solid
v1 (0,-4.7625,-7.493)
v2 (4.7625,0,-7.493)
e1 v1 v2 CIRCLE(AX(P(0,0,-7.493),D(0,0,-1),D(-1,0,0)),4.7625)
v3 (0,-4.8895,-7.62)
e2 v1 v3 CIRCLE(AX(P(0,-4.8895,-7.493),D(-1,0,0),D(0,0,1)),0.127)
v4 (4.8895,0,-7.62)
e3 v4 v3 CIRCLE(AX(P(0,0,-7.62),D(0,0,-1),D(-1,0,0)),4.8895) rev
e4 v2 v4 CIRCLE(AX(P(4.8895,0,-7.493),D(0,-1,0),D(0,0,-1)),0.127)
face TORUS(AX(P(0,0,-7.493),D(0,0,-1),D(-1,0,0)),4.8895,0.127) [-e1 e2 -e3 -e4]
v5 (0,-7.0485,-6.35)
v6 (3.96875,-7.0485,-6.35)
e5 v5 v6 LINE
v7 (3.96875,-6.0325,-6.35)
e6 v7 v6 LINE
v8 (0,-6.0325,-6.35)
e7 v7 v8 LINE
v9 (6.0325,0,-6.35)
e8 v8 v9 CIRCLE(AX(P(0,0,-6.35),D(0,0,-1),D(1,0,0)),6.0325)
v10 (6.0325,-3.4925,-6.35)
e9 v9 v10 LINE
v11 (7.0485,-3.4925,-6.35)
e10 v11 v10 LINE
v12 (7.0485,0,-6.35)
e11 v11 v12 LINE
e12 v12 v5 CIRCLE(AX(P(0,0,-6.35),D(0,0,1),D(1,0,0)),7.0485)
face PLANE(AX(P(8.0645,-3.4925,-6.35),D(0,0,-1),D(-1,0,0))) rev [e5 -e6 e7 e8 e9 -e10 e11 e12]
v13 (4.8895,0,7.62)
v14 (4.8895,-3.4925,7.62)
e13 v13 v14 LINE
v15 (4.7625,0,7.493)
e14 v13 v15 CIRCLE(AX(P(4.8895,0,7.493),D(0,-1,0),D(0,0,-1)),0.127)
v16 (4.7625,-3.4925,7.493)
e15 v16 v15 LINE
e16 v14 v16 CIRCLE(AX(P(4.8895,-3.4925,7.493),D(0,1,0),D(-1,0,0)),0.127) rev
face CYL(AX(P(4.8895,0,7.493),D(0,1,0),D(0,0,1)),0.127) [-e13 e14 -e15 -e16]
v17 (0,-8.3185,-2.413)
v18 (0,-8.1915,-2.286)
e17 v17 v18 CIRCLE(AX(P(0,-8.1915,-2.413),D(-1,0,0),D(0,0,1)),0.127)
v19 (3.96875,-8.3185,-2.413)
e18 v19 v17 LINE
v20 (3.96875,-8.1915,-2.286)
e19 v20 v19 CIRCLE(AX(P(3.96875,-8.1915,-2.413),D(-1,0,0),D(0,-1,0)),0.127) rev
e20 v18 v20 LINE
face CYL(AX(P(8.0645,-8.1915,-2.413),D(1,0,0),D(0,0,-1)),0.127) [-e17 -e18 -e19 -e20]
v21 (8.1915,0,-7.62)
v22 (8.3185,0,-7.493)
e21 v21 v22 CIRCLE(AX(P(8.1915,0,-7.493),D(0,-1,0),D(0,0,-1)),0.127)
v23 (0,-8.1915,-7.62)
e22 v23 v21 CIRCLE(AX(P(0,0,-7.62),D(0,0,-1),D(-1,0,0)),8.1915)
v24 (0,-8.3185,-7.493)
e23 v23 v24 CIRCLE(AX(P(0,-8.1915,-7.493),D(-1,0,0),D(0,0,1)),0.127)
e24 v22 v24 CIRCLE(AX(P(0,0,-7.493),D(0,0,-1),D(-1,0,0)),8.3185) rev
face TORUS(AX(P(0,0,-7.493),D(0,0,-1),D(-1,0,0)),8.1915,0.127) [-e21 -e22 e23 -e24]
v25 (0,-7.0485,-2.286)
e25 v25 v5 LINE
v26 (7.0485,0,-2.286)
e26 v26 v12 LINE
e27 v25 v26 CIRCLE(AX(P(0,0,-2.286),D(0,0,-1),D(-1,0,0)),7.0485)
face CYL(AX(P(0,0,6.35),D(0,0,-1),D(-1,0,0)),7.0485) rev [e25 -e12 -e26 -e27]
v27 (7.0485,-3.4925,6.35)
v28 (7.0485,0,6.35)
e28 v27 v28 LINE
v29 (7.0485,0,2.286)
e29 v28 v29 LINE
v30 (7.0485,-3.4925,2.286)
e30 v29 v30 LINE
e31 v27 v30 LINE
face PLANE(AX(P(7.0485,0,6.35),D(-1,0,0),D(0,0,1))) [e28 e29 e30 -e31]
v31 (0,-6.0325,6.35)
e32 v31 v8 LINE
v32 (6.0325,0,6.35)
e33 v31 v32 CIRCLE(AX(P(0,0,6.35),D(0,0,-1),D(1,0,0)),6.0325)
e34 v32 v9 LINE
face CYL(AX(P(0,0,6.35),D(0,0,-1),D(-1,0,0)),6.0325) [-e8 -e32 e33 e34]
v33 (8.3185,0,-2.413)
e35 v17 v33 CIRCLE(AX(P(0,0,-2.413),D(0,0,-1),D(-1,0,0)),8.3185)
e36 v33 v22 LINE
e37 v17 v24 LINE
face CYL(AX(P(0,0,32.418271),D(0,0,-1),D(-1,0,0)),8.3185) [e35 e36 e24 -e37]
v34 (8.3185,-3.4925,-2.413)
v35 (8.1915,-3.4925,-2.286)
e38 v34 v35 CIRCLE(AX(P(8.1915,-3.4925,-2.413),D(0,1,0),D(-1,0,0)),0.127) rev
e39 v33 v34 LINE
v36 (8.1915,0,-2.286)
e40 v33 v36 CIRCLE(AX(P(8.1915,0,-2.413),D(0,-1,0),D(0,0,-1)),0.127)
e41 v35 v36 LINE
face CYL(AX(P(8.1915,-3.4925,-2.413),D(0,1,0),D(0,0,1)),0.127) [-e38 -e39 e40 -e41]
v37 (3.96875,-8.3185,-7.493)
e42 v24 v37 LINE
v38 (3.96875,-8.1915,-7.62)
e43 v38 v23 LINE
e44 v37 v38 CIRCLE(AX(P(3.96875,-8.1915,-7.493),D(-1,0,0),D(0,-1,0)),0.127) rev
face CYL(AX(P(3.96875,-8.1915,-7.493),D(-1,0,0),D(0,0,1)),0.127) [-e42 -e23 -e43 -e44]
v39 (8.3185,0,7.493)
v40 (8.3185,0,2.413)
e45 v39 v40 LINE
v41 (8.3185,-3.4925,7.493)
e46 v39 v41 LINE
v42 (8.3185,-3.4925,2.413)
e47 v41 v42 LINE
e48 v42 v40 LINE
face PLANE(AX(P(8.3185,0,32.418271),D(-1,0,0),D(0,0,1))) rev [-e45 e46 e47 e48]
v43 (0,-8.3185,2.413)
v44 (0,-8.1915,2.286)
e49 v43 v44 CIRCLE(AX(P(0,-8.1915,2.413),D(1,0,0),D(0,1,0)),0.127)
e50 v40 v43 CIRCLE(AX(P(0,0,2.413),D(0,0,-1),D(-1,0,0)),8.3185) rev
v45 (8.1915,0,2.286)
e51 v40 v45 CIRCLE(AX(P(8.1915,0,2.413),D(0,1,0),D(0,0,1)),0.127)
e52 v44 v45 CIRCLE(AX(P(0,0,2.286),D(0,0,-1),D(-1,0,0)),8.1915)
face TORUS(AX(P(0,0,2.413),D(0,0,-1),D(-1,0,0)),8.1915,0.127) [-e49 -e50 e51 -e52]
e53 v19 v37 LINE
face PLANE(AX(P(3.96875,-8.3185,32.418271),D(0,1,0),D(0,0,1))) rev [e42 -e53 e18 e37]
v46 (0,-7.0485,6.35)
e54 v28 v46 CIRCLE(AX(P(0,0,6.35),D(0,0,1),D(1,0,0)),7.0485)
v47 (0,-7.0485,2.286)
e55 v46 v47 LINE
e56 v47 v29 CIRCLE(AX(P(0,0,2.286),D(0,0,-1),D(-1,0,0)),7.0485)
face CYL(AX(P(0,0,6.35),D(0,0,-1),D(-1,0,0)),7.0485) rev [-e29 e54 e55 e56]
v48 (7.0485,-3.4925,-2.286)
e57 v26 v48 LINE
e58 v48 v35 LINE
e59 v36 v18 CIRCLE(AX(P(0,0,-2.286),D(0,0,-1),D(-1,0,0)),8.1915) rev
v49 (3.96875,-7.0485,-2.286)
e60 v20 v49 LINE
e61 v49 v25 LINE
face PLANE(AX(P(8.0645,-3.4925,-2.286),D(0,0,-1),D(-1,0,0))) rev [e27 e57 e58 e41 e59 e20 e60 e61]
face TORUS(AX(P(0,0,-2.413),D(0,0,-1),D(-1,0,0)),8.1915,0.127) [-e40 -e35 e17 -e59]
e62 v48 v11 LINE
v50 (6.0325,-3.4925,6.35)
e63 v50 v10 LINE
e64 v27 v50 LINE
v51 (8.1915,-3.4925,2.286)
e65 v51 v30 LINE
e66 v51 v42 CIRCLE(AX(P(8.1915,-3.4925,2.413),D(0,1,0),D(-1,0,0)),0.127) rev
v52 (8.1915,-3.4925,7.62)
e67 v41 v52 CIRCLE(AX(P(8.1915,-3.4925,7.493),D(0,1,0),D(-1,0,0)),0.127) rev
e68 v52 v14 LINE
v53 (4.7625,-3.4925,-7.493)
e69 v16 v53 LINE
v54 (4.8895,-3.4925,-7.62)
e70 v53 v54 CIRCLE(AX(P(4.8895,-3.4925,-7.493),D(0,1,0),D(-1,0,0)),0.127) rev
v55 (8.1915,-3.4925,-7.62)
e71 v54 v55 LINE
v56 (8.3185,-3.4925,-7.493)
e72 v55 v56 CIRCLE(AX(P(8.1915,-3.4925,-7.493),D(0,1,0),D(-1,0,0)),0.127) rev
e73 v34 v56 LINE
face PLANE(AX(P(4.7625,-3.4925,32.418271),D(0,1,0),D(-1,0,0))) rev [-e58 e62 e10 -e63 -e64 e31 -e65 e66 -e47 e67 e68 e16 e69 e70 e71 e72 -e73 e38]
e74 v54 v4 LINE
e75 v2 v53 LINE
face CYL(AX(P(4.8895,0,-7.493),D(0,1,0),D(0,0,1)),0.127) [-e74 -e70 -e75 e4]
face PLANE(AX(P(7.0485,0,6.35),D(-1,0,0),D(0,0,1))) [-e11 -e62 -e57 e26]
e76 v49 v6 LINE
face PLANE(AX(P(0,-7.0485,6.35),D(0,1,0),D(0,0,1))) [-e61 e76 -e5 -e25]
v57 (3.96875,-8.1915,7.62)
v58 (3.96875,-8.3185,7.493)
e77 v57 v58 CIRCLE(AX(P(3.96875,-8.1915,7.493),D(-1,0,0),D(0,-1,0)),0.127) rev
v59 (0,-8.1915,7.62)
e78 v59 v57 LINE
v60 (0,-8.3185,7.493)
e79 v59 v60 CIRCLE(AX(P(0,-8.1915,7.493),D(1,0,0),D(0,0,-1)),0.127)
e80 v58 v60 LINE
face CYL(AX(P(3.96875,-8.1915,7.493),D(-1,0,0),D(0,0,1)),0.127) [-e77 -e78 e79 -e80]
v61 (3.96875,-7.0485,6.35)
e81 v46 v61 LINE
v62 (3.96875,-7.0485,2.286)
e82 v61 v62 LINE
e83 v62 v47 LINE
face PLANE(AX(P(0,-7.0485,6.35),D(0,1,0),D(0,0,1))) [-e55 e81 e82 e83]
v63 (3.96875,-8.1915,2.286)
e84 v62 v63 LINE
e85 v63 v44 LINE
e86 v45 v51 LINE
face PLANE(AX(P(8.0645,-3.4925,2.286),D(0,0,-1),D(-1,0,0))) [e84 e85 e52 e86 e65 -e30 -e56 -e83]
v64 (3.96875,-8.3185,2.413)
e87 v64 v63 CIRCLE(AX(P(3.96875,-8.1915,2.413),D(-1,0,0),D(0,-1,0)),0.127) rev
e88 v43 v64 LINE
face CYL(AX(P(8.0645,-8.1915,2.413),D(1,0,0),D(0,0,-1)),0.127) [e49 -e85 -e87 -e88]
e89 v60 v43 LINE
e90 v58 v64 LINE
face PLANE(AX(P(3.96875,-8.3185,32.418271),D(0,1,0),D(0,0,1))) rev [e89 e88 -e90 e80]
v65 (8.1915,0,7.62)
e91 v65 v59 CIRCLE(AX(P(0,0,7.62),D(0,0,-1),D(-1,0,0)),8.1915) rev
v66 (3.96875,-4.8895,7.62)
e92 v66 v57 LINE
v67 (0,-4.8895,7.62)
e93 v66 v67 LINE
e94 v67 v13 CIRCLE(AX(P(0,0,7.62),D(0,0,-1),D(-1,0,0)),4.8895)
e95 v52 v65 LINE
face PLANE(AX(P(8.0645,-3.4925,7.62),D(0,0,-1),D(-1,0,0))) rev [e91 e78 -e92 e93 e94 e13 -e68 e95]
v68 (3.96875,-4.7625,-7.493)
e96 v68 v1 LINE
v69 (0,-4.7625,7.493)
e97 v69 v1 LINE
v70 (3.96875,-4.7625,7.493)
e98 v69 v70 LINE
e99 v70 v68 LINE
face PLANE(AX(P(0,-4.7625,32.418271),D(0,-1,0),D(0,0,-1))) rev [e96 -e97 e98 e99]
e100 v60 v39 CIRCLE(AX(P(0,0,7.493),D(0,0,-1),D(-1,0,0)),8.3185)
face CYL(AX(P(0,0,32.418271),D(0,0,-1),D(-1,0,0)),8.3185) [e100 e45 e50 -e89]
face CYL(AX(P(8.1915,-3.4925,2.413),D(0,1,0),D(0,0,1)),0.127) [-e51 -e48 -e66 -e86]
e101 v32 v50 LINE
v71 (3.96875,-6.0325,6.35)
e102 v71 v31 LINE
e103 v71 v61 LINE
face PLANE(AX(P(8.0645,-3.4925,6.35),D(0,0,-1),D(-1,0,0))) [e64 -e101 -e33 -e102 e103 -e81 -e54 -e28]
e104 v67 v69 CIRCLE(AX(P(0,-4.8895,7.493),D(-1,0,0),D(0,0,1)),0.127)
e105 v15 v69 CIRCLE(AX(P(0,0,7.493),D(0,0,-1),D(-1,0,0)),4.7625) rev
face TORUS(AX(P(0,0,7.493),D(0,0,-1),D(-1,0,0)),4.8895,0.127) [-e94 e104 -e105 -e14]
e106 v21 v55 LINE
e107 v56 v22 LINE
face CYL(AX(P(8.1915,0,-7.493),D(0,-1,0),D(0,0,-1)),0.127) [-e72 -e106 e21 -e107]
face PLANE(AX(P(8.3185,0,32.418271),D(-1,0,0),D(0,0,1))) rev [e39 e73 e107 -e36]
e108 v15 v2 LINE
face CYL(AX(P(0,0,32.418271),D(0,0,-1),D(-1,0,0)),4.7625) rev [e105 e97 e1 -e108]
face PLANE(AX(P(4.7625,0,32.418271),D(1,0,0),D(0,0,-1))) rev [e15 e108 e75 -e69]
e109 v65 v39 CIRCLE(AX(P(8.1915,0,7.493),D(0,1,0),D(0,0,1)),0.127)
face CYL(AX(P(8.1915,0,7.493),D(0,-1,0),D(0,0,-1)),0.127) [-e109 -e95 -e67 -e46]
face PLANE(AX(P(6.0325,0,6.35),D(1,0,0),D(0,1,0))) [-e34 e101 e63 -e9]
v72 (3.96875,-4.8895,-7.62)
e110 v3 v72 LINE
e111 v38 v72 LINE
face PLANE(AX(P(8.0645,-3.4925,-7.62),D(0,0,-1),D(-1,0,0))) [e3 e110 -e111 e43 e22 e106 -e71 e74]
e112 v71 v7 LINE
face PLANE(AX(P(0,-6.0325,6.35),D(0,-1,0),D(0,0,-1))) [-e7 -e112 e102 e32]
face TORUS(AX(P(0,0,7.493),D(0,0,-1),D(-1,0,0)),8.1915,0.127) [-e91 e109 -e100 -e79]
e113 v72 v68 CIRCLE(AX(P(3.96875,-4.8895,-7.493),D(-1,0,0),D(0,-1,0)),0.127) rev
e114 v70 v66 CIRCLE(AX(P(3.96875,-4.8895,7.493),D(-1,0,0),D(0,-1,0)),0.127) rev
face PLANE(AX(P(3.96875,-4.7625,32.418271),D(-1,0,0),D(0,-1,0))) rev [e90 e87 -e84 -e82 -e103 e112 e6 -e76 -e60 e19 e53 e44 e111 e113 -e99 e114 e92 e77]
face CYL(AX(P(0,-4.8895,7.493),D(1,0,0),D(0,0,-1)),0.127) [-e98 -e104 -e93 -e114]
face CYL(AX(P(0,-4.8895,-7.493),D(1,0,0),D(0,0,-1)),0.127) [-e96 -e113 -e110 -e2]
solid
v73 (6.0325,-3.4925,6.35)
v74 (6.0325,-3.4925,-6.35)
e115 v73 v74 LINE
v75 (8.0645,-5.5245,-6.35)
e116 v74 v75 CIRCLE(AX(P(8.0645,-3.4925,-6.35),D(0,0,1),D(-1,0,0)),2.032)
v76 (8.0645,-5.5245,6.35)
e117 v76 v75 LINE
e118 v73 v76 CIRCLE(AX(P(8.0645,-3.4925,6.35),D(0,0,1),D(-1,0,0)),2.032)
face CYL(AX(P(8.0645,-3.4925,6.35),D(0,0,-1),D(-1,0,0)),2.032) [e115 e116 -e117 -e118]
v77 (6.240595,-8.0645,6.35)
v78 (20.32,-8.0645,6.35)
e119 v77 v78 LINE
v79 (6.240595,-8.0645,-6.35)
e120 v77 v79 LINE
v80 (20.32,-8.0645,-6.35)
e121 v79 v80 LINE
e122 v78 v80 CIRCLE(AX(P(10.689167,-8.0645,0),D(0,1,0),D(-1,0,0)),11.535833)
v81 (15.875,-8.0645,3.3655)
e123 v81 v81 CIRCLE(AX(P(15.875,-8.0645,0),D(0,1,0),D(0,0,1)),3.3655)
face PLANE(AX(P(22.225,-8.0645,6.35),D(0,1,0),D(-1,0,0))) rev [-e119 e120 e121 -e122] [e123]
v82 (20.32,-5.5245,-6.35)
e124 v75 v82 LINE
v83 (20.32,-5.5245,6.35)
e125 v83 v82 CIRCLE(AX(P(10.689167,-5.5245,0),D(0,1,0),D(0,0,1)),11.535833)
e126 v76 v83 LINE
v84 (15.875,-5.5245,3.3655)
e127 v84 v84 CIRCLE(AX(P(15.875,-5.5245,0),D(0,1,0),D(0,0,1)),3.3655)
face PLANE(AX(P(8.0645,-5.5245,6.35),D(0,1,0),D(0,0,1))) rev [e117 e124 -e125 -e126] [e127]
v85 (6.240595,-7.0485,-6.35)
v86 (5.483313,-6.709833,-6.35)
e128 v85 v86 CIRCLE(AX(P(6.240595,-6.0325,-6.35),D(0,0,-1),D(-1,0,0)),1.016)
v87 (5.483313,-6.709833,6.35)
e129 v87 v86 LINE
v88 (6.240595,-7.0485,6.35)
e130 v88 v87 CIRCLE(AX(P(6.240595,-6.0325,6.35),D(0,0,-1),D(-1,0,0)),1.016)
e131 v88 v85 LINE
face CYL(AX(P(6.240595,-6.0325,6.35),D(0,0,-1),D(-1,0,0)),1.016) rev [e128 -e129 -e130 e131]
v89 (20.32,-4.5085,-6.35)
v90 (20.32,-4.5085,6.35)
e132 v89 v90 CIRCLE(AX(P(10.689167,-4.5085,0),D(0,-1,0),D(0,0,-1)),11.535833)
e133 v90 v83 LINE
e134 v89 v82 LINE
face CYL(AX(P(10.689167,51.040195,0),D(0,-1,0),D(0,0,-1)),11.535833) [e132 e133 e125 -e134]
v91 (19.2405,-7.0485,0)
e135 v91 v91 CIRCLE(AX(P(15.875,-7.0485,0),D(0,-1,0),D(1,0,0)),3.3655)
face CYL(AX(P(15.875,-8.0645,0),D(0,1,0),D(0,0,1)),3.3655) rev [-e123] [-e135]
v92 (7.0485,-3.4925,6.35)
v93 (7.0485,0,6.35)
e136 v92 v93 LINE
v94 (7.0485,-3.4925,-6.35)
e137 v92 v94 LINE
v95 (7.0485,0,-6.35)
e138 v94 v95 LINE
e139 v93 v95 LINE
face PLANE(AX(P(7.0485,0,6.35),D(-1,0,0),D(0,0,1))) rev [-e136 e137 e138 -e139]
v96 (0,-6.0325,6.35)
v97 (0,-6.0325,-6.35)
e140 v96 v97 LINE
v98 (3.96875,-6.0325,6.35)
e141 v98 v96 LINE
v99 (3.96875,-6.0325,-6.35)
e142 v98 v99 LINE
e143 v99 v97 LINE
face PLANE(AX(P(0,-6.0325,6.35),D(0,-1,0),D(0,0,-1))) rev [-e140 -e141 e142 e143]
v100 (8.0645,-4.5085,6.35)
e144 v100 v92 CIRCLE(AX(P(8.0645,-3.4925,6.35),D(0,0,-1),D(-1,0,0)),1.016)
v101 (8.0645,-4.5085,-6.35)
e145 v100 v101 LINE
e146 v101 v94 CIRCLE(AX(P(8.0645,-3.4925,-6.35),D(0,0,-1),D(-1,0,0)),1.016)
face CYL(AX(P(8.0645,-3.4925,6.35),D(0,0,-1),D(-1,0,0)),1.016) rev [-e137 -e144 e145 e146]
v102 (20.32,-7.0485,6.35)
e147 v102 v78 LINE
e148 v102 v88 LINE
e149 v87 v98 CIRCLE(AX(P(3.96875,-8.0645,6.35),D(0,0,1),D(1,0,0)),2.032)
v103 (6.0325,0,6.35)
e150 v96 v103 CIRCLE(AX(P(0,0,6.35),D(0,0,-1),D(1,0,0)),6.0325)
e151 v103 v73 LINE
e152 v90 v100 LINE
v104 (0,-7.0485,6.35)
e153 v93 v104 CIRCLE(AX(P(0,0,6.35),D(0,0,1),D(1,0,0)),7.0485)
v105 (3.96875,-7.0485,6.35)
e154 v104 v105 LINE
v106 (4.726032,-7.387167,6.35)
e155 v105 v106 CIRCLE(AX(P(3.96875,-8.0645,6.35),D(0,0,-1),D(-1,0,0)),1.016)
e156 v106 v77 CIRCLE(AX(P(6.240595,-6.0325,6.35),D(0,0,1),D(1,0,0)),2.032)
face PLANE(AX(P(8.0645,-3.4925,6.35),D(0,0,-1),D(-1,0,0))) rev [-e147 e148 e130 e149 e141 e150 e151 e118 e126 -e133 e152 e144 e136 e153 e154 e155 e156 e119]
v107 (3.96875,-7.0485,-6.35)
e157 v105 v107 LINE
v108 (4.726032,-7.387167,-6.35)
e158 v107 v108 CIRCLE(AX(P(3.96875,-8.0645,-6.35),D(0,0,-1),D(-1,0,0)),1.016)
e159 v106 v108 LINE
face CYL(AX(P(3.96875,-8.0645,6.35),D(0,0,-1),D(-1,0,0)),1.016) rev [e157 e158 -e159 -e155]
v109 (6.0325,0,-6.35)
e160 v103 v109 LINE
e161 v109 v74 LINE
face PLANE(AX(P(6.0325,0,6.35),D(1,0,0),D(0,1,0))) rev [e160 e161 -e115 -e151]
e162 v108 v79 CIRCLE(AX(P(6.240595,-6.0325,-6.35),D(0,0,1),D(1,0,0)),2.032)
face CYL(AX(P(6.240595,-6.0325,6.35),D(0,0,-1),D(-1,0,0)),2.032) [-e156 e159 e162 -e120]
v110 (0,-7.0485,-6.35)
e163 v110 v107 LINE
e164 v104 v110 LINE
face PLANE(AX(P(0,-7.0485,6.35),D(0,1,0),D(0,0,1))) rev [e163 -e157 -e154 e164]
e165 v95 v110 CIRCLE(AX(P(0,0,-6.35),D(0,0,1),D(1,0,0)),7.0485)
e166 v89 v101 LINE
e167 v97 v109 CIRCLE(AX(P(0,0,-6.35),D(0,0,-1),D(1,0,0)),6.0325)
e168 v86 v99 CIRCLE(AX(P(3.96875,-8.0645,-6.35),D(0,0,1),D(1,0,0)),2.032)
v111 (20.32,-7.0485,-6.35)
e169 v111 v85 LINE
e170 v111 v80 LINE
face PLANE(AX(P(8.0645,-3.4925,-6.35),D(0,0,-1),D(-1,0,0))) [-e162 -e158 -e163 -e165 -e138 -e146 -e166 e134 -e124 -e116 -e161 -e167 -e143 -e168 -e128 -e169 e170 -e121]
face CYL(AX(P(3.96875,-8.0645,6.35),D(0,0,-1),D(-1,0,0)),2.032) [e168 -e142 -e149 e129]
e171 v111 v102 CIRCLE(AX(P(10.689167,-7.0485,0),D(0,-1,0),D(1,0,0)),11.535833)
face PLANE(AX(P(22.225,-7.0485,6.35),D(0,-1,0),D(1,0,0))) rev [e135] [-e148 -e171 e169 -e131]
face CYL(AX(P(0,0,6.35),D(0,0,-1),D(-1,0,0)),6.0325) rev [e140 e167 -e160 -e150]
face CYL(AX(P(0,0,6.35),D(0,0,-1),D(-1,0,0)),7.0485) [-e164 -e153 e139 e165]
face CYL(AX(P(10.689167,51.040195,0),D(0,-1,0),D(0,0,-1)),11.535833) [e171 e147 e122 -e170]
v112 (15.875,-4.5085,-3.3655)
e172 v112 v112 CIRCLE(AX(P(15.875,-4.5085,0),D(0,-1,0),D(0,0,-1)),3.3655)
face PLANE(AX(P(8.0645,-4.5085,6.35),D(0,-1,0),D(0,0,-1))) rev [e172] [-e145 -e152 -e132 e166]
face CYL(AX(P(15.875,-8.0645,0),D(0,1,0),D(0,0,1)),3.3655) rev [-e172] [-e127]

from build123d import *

# Parameters (mm, degrees)
BOSS_EXTRUDE1_DEPTH         = 6.35
SKETCH26_R                  = 3.3655
CUT_EXTRUDE1_DEPTH          = 25.480794212
CUT_EXTRUDE3_DEPTH          = 25.480794212
CUT_EXTRUDE3_DEPTH_BACK     = 25.480794212
BOSS_EXTRUDE2_DEPTH         = 7.62
BOSS_EXTRUDE2_DEPTH_BACK    = 7.62
BODY_MOVE_COPY1_START       = -8.0645
BODY_MOVE_COPY1_OUTLINE_R   = 3.3655
BODY_MOVE_COPY1_DEPTH       = 1.016
BODY_MOVE_COPY1_START_2     = -3.4925
BODY_MOVE_COPY1_2_OUTLINE_W = 1.016
BODY_MOVE_COPY1_2_OUTLINE_H = 12.7
BODY_MOVE_COPY1_2_DEPTH     = 3.4925
BODY_MOVE_COPY1_START_3     = -7.387166667
BODY_MOVE_COPY1_3_OUTLINE_W = 1.016
BODY_MOVE_COPY1_3_OUTLINE_H = 12.7
BODY_MOVE_COPY1_3_DEPTH     = 0.338666667
BODY_MOVE_COPY1_START_4     = -5.5245
BODY_MOVE_COPY1_4_OUTLINE_R = 3.3655
BODY_MOVE_COPY1_4_DEPTH     = 2.032
BODY_MOVE_COPY1_5_OUTLINE_W = 1.016
BODY_MOVE_COPY1_5_OUTLINE_H = 12.7
BODY_MOVE_COPY1_5_DEPTH     = 6.0325
BODY_MOVE_COPY1_6_OUTLINE_W = 1.016
BODY_MOVE_COPY1_6_OUTLINE_H = 12.7
BODY_MOVE_COPY1_6_DEPTH     = 1.354666667
BODY_MOVE_COPY1_START_5     = -6.35
BODY_MOVE_COPY1_7_DEPTH     = 12.7
BODY_MOVE_COPY1_8_DEPTH     = 12.7
CUT_EXTRUDE4_DEPTH          = 2.286
CUT_EXTRUDE4_DEPTH_BACK     = 2.286
FILLET1_R                   = 0.127


with BuildPart() as part:
    # Sketch25 → Boss-Extrude1 (new, symmetric)
    with BuildSketch(Plane.XY):
        with BuildLine():
            Line((0, -6.0325), (3.96875, -6.0325))
            ThreePointArc((3.96875, -6.0325), (4.798310526, -6.209546272), (5.483313377, -6.709833333))
            ThreePointArc((5.483313377, -6.709833333), (5.825814802, -6.959976864), (6.240595065, -7.0485))
            Line((6.240595065, -7.0485), (22.225, -7.0485))
            Line((22.225, -7.0485), (22.225, -8.0645))
            Line((22.225, -8.0645), (6.240595065, -8.0645))
            ThreePointArc((6.240595065, -8.0645), (5.411034539, -7.887453728), (4.726031688, -7.387166667))
            ThreePointArc((4.726031688, -7.387166667), (4.383530263, -7.137023136), (3.96875, -7.0485))
            Line((3.96875, -7.0485), (0, -7.0485))
            ThreePointArc((0, -7.0485), (-4.984042147, 4.984042147), (7.0485, 0))
            Line((7.0485, 0), (7.0485, -3.4925))
            ThreePointArc((7.0485, -3.4925), (7.34607951, -4.21092049), (8.0645, -4.5085))
            Line((8.0645, -4.5085), (22.225, -4.5085))
            Line((22.225, -4.5085), (22.225, -5.5245))
            Line((22.225, -5.5245), (8.0645, -5.5245))
            ThreePointArc((8.0645, -5.5245), (6.627659021, -4.929340979), (6.0325, -3.4925))
            Line((6.0325, -3.4925), (6.0325, 0))
            ThreePointArc((6.0325, 0), (-4.265621658, 4.265621658), (0, -6.0325))
        make_face()
    extrude(amount=BOSS_EXTRUDE1_DEPTH, both=True)

    # Sketch26 → Cut-Extrude1 (cut, through all)
    with BuildSketch(Plane(origin=(0, 0, 0), x_dir=(1, 0, 0), z_dir=(0, 1, 0))):
        with Locations(Location((15.875, 0, 0), (0, 0, 270))):
            Circle(SKETCH26_R)
    extrude(amount=-CUT_EXTRUDE1_DEPTH, mode=Mode.SUBTRACT)

    # Sketch4 → Cut-Extrude3 (cut, two sides: drawn at the far end of the back side and taken through both)
    with BuildSketch(Plane(origin=(0, 0, 0), x_dir=(1, 0, 0), z_dir=(0, 1, 0)).offset(-CUT_EXTRUDE3_DEPTH_BACK)):
        with BuildLine():
            Line((-18.401015586, 65.076873638), (20.32, 6.35))
            ThreePointArc((20.32, 6.35), (22.225, 0), (20.32, -6.35))
            Line((20.32, -6.35), (-18.401015586, -65.076873638))
            Line((-18.401015586, -65.076873638), (122.285341042, -65.076873638))
            Line((122.285341042, -65.076873638), (122.285341042, 65.076873638))
            Line((122.285341042, 65.076873638), (-18.401015586, 65.076873638))
        make_face()
    extrude(amount=CUT_EXTRUDE3_DEPTH + CUT_EXTRUDE3_DEPTH_BACK, mode=Mode.SUBTRACT)


with BuildPart() as body_2:
    # Sketch5 → Boss-Extrude2 (new, two sides: drawn at the far end of the back side and taken through both)
    with BuildSketch(Plane.XY.offset(-BOSS_EXTRUDE2_DEPTH_BACK)):
        with BuildLine():
            Line((4.7625, 0), (4.7625, -3.4925))
            Line((4.7625, -3.4925), (8.3185, -3.4925))
            Line((8.3185, -3.4925), (8.3185, 0))
            ThreePointArc((8.3185, 0), (-5.882067759, 5.882067759), (0, -8.3185))
            Line((0, -8.3185), (3.96875, -8.3185))
            Line((3.96875, -8.3185), (3.96875, -4.7625))
            Line((3.96875, -4.7625), (0, -4.7625))
            ThreePointArc((0, -4.7625), (-3.367596045, 3.367596045), (4.7625, 0))
        make_face()
    extrude(amount=BOSS_EXTRUDE2_DEPTH + BOSS_EXTRUDE2_DEPTH_BACK)


with BuildPart() as body_3:
    # Body-Move/Copy1: read off the stored shape, not the designer's step
    # Body-Move/Copy1 outline → Body-Move/Copy1 (new body)
    with BuildSketch(Plane(origin=(0, 0, 0), x_dir=(1, 0, 0), z_dir=(0, 1, 0)).offset(BODY_MOVE_COPY1_START)):
        with BuildLine():
            Line((7.0485, -6.35), (20.32, -6.35))
            ThreePointArc((20.32, -6.35), (22.225, 0), (20.32, 6.35))
            Line((20.32, 6.35), (7.0485, 6.35))
            Line((7.0485, 6.35), (7.0485, -6.35))
        make_face()
        with Locations((15.875, 0)):
            Circle(BODY_MOVE_COPY1_OUTLINE_R, mode=Mode.SUBTRACT)
    extrude(amount=BODY_MOVE_COPY1_DEPTH)

    # Body-Move_Copy1 2 outline → Body-Move_Copy1 2 (add)
    with BuildSketch(Plane(origin=(0, 0, 0), x_dir=(1, 0, 0), z_dir=(0, 1, 0)).offset(BODY_MOVE_COPY1_START_2)):
        with Locations((6.5405, 0)):
            Rectangle(BODY_MOVE_COPY1_2_OUTLINE_W, BODY_MOVE_COPY1_2_OUTLINE_H)
    extrude(amount=BODY_MOVE_COPY1_2_DEPTH)

    # Body-Move_Copy1 3 outline → Body-Move_Copy1 3 (add)
    with BuildSketch(Plane(origin=(0, 0, 0), x_dir=(1, 0, 0), z_dir=(0, 1, 0)).offset(BODY_MOVE_COPY1_START_3)):
        with Locations((6.5405, 0)):
            Rectangle(BODY_MOVE_COPY1_3_OUTLINE_W, BODY_MOVE_COPY1_3_OUTLINE_H)
    extrude(amount=BODY_MOVE_COPY1_3_DEPTH)

    # Body-Move_Copy1 4 outline → Body-Move_Copy1 4 (add)
    with BuildSketch(Plane(origin=(0, 0, 0), x_dir=(1, 0, 0), z_dir=(0, 1, 0)).offset(BODY_MOVE_COPY1_START_4)):
        with BuildLine():
            ThreePointArc((20.32, -6.35), (22.225, 0), (20.32, 6.35))
            Line((20.32, 6.35), (6.0325, 6.35))
            Line((6.0325, 6.35), (6.0325, -6.35))
            Line((6.0325, -6.35), (20.32, -6.35))
        make_face()
        with Locations((15.875, 0)):
            Circle(BODY_MOVE_COPY1_4_OUTLINE_R, mode=Mode.SUBTRACT)
    extrude(amount=BODY_MOVE_COPY1_4_DEPTH)

    # Body-Move_Copy1 5 outline → Body-Move_Copy1 5 (add)
    with BuildSketch(Plane(origin=(0, 0, 0), x_dir=(1, 0, 0), z_dir=(0, 1, 0))):
        with Locations((6.5405, 0)):
            Rectangle(BODY_MOVE_COPY1_5_OUTLINE_W, BODY_MOVE_COPY1_5_OUTLINE_H)
    extrude(amount=BODY_MOVE_COPY1_5_DEPTH)

    # Body-Move_Copy1 6 outline → Body-Move_Copy1 6 (add)
    with BuildSketch(Plane(origin=(0, 0, 0), x_dir=(1, 0, 0), z_dir=(0, 1, 0)).offset(BODY_MOVE_COPY1_START)):
        with Locations((6.5405, 0)):
            Rectangle(BODY_MOVE_COPY1_6_OUTLINE_W, BODY_MOVE_COPY1_6_OUTLINE_H)
    extrude(amount=BODY_MOVE_COPY1_6_DEPTH)

    # Body-Move_Copy1 7 outline → Body-Move_Copy1 7 (cut)
    with BuildSketch(Plane.XY.offset(BODY_MOVE_COPY1_START_5)):
        with BuildLine():
            ThreePointArc((7.0485, -3.4925), (7.34607951, -4.21092049), (8.0645, -4.5085))
            Line((8.0645, -4.5085), (24, -4.5085))
            Line((24, -4.5085), (24, -3.4925))
            Line((24, -3.4925), (7.0485, -3.4925))
        make_face()
        with BuildLine():
            ThreePointArc((6.032499998, 3.645585828), (6.789750676, 1.892257384), (7.0485, 0))
            Line((7.0485, 0), (7.0485, 6.0325))
            Line((7.0485, 6.0325), (6.0325, 6.0325))
            Line((6.0325, 6.0325), (6.032499998, 3.645585828))
        make_face()
        with BuildLine():
            Line((6.0325, -5.5245), (8.0645, -5.5245))
            ThreePointArc((8.0645, -5.5245), (6.627659021, -4.929340979), (6.0325, -3.4925))
            Line((6.0325, -3.4925), (6.0325, -5.5245))
        make_face()
        with BuildLine():
            Line((7.0485, -7.0485), (7.0485, -6.709833333))
            Line((7.0485, -6.709833333), (6.0325, -6.709833333))
            Line((6.0325, -6.709833333), (6.0325, -7.026960881))
            ThreePointArc((6.0325, -7.026960881), (6.13599166, -7.043100875), (6.240595065, -7.0485))
            Line((6.240595065, -7.0485), (7.0485, -7.0485))
        make_face()
        with BuildLine():
            Line((7.0485, -10), (7.0485, -8.064500001))
            Line((7.0485, -8.064500001), (6.240595065, -8.0645))
            ThreePointArc((6.240595065, -8.0645), (6.136410502, -8.06182737), (6.0325, -8.053816512))
            Line((6.0325, -8.053816512), (6.0325, -10))
            Line((6.0325, -10), (7.0485, -10))
        make_face()
    extrude(amount=BODY_MOVE_COPY1_7_DEPTH, mode=Mode.SUBTRACT)

    # Body-Move_Copy1 8 outline → Body-Move_Copy1 8 (add)
    with BuildSketch(Plane.XY.offset(BODY_MOVE_COPY1_START_5)):
        with BuildLine():
            Line((6.0325, 0), (6.032499998, 3.645585828))
            ThreePointArc((6.032499998, 3.645585828), (-6.139106773, 3.463050717), (0, -7.0485))
            Line((0, -7.0485), (3.96875, -7.0485))
            ThreePointArc((3.96875, -7.0485), (4.383530263, -7.137023136), (4.726031688, -7.387166667))
            ThreePointArc((4.726031688, -7.387166667), (5.317018576, -7.842480792), (6.0325, -8.053816512))
            Line((6.0325, -8.053816512), (6.0325, -7.026960881))
            ThreePointArc((6.0325, -7.026960881), (5.732529578, -6.912343998), (5.483313377, -6.709833333))
            ThreePointArc((5.483313377, -6.709833333), (4.798310526, -6.209546272), (3.96875, -6.0325))
            Line((3.96875, -6.0325), (0, -6.0325))
            ThreePointArc((0, -6.0325), (-4.265621658, 4.265621658), (6.0325, 0))
        make_face()
    extrude(amount=BODY_MOVE_COPY1_8_DEPTH)


with BuildPart() as body_2_1:
    add(body_2.part)

    # Combine1: cut body 3
    add(body_3.part, mode=Mode.SUBTRACT)

    # Sketch7 → Cut-Extrude4 (cut, two sides: drawn at the far end of the back side and taken through both)
    with BuildSketch(Plane.XY.offset(-CUT_EXTRUDE4_DEPTH_BACK)):
        with BuildLine():
            Line((6.0325, 0), (6.0325, -3.4925))
            Line((6.0325, -3.4925), (8.3185, -3.4925))
            Line((8.3185, -3.4925), (8.3185, 0))
            ThreePointArc((8.3185, 0), (-5.882067759, 5.882067759), (0, -8.3185))
            Line((0, -8.3185), (3.96875, -8.3185))
            Line((3.96875, -8.3185), (3.96875, -6.0325))
            Line((3.96875, -6.0325), (0, -6.0325))
            ThreePointArc((0, -6.0325), (-4.265621658, 4.265621658), (6.0325, 0))
        make_face()
    extrude(amount=CUT_EXTRUDE4_DEPTH + CUT_EXTRUDE4_DEPTH_BACK, mode=Mode.SUBTRACT)

    # Fillet1
    fillet1_edges = [body_2_1.edges().sort_by_distance(p)[0] for p in [
        (1.984375, -8.3185, 2.286),
        (1.984375, -8.3185, -2.286),
        (-5.882067759, 5.882067759, 2.286),
        (-5.882067759, 5.882067759, -2.286),
        (8.3185, -1.74625, 2.286),
        (8.3185, -1.74625, -2.286),
        (1.984375, -4.7625, 7.62),
        (1.984375, -8.3185, 7.62),
        (-5.882067759, 5.882067759, 7.62),
        (8.3185, -1.74625, 7.62),
        (4.7625, -1.74625, 7.62),
        (-3.367596045, 3.367596045, 7.62),
        (4.7625, -1.74625, -7.62),
        (8.3185, -1.74625, -7.62),
        (-5.882067759, 5.882067759, -7.62),
        (1.984375, -8.3185, -7.62),
        (1.984375, -4.7625, -7.62),
        (-3.367596045, 3.367596045, -7.62),
    ]]
    fillet(fillet1_edges, radius=FILLET1_R)


solid = Compound([part.part, body_2_1.part])
